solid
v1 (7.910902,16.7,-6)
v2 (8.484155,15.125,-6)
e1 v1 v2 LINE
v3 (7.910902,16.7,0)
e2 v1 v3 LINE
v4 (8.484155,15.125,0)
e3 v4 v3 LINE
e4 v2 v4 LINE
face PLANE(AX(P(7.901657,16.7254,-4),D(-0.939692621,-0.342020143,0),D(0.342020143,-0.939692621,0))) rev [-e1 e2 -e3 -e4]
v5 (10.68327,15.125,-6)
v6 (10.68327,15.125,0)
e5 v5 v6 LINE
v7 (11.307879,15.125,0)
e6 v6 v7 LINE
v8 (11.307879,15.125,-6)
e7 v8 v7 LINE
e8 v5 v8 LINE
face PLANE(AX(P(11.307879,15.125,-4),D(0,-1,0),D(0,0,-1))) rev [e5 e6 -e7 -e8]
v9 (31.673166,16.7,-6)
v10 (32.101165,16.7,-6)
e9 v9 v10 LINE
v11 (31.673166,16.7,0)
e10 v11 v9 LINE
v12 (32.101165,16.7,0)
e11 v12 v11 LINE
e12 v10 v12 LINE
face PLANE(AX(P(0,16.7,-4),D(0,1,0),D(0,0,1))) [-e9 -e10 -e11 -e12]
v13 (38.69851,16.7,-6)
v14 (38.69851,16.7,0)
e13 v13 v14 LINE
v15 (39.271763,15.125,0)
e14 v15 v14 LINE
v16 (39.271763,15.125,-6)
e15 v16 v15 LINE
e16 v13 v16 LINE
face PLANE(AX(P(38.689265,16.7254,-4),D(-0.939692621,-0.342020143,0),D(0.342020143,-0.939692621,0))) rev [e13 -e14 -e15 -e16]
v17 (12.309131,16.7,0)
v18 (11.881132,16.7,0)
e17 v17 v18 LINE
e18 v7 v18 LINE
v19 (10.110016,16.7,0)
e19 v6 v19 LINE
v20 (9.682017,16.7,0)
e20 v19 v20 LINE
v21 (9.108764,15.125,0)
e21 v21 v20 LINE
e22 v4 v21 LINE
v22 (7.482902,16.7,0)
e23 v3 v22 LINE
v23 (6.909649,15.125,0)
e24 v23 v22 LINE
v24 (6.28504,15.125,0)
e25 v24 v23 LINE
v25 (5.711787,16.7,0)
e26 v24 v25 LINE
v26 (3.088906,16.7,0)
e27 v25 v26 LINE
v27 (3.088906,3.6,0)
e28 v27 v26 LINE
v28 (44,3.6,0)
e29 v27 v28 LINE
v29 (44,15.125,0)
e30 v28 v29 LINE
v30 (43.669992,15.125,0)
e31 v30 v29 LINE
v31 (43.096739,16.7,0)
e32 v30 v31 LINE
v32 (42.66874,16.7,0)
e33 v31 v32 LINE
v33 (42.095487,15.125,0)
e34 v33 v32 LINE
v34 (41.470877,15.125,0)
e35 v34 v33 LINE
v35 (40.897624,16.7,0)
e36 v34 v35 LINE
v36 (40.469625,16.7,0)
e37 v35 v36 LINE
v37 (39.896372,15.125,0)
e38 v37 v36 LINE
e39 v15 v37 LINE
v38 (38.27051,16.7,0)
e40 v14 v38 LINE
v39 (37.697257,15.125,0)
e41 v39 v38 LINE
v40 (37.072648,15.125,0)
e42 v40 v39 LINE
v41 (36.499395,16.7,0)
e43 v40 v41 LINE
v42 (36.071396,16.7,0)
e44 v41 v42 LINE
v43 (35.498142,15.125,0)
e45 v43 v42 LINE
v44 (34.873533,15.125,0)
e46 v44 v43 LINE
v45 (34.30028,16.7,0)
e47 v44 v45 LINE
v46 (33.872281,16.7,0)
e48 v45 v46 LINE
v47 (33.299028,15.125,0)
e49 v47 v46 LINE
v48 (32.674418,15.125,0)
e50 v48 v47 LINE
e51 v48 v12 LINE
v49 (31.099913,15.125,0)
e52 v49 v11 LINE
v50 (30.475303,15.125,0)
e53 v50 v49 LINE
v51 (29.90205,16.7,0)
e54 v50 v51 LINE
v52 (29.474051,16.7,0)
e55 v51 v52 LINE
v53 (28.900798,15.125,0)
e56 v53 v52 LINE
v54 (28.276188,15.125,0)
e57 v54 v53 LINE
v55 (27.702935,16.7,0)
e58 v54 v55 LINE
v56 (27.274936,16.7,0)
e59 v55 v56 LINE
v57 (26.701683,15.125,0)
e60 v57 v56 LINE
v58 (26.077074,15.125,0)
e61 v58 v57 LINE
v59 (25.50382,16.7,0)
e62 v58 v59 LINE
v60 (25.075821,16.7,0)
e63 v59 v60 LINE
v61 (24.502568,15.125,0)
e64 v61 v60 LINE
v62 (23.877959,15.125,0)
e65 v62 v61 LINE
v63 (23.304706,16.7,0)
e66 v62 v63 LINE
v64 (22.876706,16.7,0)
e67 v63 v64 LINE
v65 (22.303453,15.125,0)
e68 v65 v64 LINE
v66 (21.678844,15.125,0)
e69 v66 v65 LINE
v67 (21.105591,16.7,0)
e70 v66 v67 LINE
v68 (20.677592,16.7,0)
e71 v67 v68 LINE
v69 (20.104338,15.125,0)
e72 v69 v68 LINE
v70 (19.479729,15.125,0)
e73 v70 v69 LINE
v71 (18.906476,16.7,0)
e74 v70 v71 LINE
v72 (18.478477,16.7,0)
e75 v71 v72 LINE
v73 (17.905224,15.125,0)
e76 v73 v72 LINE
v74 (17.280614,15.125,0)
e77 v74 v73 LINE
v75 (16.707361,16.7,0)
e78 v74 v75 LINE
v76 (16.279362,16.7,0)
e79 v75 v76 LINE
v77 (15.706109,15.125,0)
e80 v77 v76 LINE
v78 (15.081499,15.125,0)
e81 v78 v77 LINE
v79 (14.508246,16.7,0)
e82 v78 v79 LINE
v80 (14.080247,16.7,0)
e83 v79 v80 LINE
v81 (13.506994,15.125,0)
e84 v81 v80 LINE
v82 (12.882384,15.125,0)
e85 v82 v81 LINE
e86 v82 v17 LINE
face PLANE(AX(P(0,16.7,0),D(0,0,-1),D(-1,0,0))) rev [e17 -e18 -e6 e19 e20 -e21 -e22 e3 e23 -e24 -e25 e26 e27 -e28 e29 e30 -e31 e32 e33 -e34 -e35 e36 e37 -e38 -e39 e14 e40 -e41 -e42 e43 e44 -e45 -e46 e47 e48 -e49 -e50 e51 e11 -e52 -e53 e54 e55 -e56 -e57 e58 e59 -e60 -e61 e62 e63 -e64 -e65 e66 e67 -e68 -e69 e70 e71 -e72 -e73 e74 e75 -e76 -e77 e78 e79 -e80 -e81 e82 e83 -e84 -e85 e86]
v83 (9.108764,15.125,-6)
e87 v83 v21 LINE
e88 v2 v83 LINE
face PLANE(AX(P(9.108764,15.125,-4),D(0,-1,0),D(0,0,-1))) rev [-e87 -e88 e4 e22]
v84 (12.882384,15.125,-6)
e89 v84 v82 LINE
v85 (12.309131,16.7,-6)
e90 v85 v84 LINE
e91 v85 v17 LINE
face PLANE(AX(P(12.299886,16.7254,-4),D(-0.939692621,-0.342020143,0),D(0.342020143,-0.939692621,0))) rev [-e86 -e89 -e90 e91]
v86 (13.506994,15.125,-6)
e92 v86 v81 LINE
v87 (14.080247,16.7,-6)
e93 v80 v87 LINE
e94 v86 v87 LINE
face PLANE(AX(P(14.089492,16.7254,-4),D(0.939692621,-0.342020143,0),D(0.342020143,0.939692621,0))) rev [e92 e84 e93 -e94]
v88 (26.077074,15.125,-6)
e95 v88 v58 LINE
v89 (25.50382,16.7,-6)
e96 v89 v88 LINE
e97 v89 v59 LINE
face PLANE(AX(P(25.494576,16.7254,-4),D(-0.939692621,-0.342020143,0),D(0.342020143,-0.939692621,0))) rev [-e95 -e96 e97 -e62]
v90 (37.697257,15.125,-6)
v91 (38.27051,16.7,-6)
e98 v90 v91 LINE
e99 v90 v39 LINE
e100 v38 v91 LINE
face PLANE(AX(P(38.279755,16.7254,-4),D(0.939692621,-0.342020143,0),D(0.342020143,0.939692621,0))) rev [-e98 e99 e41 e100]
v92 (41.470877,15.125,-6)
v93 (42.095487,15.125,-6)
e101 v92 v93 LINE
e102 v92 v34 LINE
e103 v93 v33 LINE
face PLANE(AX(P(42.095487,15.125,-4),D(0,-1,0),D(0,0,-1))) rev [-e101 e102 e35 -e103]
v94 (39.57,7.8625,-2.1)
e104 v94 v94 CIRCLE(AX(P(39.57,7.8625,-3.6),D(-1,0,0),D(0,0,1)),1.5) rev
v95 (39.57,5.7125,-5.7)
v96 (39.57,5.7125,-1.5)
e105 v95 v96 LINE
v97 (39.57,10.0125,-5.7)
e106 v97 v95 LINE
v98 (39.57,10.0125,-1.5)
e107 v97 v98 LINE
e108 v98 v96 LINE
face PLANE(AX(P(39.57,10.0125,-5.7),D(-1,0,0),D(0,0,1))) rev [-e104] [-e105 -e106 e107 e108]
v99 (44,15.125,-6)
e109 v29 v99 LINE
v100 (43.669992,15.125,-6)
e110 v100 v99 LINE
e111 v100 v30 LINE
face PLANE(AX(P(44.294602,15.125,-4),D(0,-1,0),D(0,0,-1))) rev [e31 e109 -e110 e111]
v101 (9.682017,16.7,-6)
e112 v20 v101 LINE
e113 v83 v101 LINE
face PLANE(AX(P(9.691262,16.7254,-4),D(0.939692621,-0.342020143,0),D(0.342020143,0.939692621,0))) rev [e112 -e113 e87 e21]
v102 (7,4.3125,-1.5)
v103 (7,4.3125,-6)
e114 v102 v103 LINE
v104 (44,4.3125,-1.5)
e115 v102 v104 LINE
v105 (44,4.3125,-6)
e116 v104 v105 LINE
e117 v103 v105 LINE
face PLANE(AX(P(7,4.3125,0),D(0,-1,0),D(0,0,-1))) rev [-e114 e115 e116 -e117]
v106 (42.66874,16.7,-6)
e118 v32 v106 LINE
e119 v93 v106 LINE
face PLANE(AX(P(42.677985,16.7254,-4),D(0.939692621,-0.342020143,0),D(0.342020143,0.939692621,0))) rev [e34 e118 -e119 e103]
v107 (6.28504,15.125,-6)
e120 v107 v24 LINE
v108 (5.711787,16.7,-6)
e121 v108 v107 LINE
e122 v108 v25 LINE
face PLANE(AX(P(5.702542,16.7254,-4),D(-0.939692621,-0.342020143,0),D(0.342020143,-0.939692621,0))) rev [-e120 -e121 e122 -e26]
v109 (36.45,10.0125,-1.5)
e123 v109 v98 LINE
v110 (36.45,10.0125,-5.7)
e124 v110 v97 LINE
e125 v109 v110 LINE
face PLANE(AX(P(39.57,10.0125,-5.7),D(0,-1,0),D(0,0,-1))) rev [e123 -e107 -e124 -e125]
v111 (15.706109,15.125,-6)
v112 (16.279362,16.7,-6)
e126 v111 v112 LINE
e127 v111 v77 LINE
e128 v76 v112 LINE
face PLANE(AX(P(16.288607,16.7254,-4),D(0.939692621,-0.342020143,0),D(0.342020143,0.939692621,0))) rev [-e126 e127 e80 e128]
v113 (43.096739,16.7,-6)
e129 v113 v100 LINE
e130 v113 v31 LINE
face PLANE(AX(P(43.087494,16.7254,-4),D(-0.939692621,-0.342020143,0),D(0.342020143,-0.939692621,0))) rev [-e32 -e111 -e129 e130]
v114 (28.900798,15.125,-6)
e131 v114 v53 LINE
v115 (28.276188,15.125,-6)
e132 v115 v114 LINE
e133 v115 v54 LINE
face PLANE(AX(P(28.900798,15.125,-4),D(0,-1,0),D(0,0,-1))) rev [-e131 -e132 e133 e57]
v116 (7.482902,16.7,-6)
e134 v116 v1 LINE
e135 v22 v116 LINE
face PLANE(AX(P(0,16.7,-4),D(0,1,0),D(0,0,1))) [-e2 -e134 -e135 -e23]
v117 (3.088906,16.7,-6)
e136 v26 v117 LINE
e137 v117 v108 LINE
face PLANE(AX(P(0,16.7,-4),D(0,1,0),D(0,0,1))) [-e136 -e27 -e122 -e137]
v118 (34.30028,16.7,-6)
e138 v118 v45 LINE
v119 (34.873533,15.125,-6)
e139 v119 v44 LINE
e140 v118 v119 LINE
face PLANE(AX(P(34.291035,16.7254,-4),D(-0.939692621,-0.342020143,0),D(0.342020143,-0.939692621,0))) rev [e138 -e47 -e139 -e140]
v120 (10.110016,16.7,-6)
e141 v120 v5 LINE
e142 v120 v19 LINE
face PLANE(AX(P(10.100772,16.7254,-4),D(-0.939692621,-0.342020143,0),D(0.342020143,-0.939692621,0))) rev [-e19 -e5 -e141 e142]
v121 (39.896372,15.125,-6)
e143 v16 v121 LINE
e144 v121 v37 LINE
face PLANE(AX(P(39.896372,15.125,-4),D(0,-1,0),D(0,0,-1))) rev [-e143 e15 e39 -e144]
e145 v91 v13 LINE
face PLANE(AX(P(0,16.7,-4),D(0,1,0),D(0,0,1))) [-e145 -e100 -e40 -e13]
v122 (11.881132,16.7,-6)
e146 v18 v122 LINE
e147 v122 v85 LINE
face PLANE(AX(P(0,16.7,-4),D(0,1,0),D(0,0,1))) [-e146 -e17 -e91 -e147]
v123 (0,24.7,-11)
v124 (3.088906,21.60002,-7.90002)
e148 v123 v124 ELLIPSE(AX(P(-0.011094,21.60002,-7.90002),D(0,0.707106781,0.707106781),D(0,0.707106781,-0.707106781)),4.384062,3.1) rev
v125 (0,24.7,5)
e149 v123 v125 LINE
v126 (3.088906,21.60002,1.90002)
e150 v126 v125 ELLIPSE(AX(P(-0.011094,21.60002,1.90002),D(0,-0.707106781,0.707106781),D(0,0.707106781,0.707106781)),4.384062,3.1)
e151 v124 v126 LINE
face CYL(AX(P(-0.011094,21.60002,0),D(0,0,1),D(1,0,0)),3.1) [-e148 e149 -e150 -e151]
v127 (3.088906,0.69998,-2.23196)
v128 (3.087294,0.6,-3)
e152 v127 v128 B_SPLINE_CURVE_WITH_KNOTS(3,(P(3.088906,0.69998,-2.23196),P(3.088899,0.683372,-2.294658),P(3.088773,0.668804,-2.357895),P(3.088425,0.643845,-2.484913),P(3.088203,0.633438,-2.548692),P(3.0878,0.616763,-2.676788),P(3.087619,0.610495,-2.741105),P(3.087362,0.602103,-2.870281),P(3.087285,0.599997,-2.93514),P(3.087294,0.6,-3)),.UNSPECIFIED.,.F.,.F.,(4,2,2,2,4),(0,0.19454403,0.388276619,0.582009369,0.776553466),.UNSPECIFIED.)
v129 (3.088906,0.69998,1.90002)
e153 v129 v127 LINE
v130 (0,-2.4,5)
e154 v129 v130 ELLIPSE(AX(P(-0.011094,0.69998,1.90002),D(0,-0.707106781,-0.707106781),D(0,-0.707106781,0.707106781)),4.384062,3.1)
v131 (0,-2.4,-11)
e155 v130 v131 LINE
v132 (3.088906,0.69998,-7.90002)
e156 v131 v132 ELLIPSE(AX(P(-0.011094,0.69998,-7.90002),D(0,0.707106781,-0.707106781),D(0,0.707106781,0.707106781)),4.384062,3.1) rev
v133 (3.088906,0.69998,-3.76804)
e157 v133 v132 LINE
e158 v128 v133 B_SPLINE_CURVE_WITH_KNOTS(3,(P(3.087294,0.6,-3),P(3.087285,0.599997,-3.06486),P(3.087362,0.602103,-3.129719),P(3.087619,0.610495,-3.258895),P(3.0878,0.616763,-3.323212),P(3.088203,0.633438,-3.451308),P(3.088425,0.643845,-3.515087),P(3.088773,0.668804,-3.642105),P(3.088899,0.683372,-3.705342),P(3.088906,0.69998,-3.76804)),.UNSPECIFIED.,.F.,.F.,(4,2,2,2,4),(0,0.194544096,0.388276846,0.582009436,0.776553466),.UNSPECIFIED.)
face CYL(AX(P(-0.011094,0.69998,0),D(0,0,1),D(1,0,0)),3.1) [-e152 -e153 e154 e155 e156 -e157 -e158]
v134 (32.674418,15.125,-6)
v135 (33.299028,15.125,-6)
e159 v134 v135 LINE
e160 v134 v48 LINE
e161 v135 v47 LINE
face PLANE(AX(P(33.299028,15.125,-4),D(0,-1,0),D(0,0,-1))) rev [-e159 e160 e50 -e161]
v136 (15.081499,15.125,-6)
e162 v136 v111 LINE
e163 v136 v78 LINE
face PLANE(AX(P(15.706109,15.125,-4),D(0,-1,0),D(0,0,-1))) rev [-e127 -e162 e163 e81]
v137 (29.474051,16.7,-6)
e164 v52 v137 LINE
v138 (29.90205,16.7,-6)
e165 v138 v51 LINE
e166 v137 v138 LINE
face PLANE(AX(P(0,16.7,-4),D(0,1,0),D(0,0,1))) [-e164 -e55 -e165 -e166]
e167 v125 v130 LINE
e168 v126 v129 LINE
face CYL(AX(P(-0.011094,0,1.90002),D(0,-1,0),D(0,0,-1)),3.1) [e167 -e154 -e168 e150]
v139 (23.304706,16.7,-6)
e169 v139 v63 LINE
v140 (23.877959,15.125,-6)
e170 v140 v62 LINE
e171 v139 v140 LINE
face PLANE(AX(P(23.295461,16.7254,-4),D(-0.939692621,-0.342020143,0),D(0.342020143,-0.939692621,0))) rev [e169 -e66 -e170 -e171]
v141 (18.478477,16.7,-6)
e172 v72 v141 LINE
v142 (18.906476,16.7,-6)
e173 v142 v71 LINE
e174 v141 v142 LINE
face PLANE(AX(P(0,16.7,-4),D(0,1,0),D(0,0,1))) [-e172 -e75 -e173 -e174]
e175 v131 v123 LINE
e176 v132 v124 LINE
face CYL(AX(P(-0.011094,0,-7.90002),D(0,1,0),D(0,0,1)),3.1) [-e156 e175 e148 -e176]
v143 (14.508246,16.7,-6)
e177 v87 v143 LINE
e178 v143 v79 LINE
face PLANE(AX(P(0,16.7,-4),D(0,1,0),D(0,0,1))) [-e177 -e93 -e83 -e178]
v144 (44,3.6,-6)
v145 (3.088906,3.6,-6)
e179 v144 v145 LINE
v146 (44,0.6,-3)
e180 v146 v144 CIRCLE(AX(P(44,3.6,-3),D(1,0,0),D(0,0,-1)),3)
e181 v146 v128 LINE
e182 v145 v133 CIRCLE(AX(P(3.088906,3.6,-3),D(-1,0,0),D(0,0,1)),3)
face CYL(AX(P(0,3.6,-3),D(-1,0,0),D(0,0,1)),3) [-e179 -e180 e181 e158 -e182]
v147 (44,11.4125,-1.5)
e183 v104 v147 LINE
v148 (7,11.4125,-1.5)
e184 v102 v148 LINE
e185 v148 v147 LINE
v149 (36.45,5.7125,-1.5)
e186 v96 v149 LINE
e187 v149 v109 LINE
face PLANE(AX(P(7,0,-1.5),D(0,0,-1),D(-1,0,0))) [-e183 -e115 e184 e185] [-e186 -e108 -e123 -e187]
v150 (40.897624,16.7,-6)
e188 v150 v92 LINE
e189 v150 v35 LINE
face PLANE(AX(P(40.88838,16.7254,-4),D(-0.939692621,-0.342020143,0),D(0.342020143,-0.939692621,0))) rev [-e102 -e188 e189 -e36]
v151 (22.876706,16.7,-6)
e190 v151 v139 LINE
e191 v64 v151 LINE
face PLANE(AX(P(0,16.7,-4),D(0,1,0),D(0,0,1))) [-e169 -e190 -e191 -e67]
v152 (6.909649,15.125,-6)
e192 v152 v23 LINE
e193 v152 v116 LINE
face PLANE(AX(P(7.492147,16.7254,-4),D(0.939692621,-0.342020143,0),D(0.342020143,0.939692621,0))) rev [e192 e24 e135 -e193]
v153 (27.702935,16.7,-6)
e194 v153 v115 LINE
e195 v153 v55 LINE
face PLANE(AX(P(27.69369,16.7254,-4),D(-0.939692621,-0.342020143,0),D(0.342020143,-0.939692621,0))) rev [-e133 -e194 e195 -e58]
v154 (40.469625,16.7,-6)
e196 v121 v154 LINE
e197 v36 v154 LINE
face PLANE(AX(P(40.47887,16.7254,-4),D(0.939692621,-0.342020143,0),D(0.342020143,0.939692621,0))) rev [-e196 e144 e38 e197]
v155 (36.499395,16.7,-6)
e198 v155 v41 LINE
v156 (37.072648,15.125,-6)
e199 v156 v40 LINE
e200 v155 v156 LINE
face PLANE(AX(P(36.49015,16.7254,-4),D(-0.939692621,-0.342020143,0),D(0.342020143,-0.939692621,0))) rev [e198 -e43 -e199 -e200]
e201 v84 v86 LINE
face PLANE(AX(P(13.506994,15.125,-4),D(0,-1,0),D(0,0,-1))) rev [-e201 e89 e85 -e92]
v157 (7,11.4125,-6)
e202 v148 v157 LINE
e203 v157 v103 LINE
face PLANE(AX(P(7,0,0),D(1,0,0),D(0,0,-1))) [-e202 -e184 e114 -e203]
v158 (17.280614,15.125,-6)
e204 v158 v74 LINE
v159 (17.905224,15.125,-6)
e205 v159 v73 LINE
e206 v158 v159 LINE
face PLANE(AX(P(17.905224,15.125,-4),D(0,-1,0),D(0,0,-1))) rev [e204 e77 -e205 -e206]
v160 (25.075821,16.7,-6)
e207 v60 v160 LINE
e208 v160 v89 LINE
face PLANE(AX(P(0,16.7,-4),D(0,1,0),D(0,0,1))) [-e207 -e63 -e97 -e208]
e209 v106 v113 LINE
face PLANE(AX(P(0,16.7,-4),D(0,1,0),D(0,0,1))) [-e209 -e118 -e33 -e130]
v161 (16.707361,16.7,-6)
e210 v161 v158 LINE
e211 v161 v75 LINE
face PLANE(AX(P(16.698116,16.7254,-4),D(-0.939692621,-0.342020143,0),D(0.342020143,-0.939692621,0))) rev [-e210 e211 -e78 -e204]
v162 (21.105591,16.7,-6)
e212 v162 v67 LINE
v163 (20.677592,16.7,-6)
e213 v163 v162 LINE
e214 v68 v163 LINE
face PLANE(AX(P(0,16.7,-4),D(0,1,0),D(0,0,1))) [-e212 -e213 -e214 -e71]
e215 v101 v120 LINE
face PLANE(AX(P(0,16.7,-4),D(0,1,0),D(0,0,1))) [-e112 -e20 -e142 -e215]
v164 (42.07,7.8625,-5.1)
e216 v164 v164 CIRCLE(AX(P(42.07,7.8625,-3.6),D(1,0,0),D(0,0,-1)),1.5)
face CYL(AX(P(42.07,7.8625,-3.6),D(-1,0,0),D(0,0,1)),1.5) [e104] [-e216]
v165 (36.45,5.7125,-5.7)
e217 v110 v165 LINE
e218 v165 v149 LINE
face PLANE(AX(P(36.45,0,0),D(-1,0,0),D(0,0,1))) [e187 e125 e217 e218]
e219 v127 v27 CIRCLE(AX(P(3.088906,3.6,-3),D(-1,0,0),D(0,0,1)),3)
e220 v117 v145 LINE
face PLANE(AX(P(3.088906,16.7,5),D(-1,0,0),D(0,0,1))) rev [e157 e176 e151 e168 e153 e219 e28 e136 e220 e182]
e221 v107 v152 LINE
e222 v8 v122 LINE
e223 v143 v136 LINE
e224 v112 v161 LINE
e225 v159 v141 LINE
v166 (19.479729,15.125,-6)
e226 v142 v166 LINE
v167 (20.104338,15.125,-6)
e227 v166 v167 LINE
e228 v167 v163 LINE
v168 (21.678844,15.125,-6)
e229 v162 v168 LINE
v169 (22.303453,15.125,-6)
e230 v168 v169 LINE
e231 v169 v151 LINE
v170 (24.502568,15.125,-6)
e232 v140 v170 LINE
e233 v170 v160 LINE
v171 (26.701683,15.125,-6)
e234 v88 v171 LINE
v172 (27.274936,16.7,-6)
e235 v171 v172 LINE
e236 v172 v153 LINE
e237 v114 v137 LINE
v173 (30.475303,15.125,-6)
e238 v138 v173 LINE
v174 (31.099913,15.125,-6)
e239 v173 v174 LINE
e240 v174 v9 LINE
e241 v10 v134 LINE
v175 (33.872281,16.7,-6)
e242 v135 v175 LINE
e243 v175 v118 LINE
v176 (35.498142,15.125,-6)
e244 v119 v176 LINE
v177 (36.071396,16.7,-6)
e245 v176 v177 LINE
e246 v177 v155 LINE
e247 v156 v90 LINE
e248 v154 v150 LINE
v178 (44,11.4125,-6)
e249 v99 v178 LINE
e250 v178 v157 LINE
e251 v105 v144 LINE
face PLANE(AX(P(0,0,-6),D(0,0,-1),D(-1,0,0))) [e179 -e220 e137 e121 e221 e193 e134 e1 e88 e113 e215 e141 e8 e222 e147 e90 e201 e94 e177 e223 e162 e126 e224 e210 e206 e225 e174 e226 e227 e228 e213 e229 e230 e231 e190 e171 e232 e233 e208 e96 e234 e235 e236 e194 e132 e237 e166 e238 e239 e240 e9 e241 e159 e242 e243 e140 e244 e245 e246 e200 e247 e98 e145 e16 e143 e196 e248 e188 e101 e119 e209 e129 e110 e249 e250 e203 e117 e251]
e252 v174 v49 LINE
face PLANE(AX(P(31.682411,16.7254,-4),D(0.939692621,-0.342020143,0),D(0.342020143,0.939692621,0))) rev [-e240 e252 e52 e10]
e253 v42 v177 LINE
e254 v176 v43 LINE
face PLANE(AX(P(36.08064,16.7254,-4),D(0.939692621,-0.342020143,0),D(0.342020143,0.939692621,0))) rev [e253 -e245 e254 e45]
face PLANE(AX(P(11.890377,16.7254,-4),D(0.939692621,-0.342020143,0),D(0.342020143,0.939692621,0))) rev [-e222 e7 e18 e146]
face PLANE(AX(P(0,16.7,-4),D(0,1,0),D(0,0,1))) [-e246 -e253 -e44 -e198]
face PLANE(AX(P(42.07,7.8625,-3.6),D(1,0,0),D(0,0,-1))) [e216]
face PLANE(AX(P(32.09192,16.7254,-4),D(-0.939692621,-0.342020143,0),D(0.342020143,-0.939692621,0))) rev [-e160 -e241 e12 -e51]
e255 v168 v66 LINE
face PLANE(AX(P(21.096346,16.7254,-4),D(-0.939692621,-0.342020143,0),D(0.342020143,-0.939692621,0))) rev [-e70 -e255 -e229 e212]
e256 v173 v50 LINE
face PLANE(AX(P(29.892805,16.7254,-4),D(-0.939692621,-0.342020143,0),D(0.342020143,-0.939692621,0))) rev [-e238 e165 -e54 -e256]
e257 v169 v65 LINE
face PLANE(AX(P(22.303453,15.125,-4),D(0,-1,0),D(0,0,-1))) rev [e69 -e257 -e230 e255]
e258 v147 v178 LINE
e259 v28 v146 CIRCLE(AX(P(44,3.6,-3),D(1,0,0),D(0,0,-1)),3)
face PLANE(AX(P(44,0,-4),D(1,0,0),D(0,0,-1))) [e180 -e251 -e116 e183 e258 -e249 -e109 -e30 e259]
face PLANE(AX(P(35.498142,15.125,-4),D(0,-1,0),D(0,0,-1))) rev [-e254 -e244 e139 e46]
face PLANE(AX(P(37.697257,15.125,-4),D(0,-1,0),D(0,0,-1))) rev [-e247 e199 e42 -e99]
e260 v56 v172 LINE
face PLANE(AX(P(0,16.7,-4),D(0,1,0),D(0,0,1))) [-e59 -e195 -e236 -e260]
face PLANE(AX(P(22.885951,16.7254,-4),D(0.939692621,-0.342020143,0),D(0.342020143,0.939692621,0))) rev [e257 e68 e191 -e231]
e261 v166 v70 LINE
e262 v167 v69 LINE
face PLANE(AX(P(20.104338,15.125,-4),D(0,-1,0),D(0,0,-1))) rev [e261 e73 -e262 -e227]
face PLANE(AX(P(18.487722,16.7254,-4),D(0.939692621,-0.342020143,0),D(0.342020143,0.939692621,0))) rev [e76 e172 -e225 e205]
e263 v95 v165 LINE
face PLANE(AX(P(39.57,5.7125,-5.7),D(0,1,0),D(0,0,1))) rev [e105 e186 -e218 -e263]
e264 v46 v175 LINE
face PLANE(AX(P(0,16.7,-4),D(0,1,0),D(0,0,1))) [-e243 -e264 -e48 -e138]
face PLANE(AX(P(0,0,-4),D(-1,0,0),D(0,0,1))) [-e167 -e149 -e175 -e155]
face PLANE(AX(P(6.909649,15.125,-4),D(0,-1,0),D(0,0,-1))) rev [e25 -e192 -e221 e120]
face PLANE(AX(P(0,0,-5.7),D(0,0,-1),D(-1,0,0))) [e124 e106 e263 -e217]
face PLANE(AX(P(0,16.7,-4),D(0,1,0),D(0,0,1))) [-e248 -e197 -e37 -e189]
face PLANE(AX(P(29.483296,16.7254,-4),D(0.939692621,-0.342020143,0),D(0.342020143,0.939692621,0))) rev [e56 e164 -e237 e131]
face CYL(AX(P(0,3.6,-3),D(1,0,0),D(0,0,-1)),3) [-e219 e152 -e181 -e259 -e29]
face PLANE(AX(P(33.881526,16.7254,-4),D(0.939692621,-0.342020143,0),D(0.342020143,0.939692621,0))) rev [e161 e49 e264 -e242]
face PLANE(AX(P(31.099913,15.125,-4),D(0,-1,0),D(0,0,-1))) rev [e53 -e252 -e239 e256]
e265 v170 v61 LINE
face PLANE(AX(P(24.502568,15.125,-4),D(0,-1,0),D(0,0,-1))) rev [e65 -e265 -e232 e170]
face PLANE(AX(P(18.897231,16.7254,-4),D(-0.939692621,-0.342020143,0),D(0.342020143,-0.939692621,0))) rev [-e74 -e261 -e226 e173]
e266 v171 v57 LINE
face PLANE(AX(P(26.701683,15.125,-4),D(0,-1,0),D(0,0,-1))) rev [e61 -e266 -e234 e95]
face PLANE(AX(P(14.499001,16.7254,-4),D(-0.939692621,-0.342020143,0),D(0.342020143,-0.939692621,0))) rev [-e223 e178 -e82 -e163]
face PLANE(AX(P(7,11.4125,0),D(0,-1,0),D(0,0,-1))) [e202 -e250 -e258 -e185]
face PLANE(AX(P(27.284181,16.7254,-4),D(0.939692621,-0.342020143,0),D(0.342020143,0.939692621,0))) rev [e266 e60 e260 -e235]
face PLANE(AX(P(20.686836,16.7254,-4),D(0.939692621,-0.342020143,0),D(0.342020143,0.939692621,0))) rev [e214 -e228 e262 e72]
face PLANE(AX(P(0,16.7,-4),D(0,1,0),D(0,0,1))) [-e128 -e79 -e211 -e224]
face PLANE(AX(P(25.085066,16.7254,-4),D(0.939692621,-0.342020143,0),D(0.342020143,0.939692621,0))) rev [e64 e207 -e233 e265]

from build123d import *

# Parameters (mm, degrees)
BLANKSKE_W               = 44
BLANKSKE_H               = 16.7
BLANK_DEPTH              = 4
TOOTHCUTSIM_DEPTH        = 48.232298271
TEETHCUTS_COUNT          = 21
TEETHCUTS_PITCH          = 2.199114855
CROQUIS2_W               = 44
CROQUIS2_H               = 4
CORTAR_EXTRUIR2_DEPTH    = 0.6
CROQUIS3_W               = 2.5
CROQUIS3_H               = 7.1
CORTAR_EXTRUIR3_DEPTH    = 37
CROQUIS4_W               = 5.711786687
CROQUIS4_H               = 1.575
SALIENTE_EXTRUIR4_DEPTH  = 4
CROQUIS5_W               = 1.12
CROQUIS5_H               = 4.3
SALIENTE_EXTRUIR5_DEPTH  = 4.2
CROQUIS14_R              = 1.5
SALIENTE_EXTRUIR11_DEPTH = 2.5
CROQUIS15_W              = 3.088906297
CROQUIS15_H              = 16.1
SALIENTE_EXTRUIR12_DEPTH = 5
CROQUIS16_W              = 2.855893344
CROQUIS16_H              = 16.1
SALIENTE_EXTRUIR13_DEPTH = 5
SALIENTE_EXTRUIR14_DEPTH = 2
CROQUIS18_W              = 4.2
CROQUIS18_H              = 4.3
SALIENTE_EXTRUIR15_DEPTH = 2
CROQUIS19_W              = 2.855893344
CROQUIS19_H              = 14
SALIENTE_EXTRUIR16_DEPTH = 8
CROQUIS20_W              = 2.855893344
CROQUIS20_H              = 24.1
SALIENTE_EXTRUIR18_DEPTH = 2
SALIENTE_EXTRUIR19_DEPTH = 3
CROQUIS31_W              = 2.855893344
CROQUIS31_H              = 27.1
SALIENTE_EXTRUIR20_DEPTH = 16
CROQUIS32_W              = 3.088906297
CROQUIS32_H              = 27.1
SALIENTE_EXTRUIR21_DEPTH = 16
REDONDEO3_R              = 3
REDONDEO4_R              = 3.1


# Some blends are built 0.0001 mm under size
with BuildPart() as part:
    # BlankSke → Blank (new body)
    with BuildSketch(Plane.XY):
        with Locations((22, 8.35)):
            Rectangle(BLANKSKE_W, BLANKSKE_H)
    extrude(amount=-BLANK_DEPTH)

    # TooCutSkeSim → ToothCutSim (cut, through all)
    with BuildSketch(Plane.XY):
        Polygon((0.312304759, 15.125), (-0.312304759, 15.125), (-0.894802722, 16.7254), (0.894802722, 16.7254), align=None)
    toothcutsim = extrude(amount=-TOOTHCUTSIM_DEPTH, mode=Mode.SUBTRACT)

    # TeethCuts: ToothCutSim ×21
    with Locations(*[(i * TEETHCUTS_PITCH, 0, 0) for i in range(1, TEETHCUTS_COUNT)]):
        add(toothcutsim, mode=Mode.SUBTRACT)

    # Croquis2 → Cortar-Extruir2 (cut)
    with BuildSketch(Plane.XZ):
        with Locations((22, -2)):
            Rectangle(CROQUIS2_W, CROQUIS2_H)
    extrude(amount=-CORTAR_EXTRUIR2_DEPTH, mode=Mode.SUBTRACT)

    # Croquis3 → Cortar-Extruir3 (cut)
    with BuildSketch(Plane(origin=(44, 0, 0), x_dir=(0, 0, -1), z_dir=(1, 0, 0))):
        with Locations((2.75, 7.8625)):
            Rectangle(CROQUIS3_W, CROQUIS3_H)
    extrude(amount=-CORTAR_EXTRUIR3_DEPTH, mode=Mode.SUBTRACT)

    # Croquis4 → Saliente-Extruir4 (add)
    with BuildSketch(Plane.XY):
        with Locations((2.855893344, 15.9125)):
            Rectangle(CROQUIS4_W, CROQUIS4_H)
    extrude(amount=-SALIENTE_EXTRUIR4_DEPTH)

    # Croquis5 → Saliente-Extruir5 (add)
    with BuildSketch(Plane(origin=(0, 0, -1.5), x_dir=(-1, 0, 0), z_dir=(0, 0, -1))):
        with Locations((-39.01, 7.8625)):
            Rectangle(CROQUIS5_W, CROQUIS5_H)
    extrude(amount=SALIENTE_EXTRUIR5_DEPTH)

    # Croquis14 → Saliente-Extruir11 (add)
    with BuildSketch(Plane(origin=(39.57, 0, 0), x_dir=(0, 0, -1), z_dir=(1, 0, 0))):
        with Locations(Location((3.6, 7.8625, 0), (0, 0, 180))):
            Circle(CROQUIS14_R)
    extrude(amount=SALIENTE_EXTRUIR11_DEPTH)

    # Croquis15 → Saliente-Extruir12 (add)
    with BuildSketch(Plane.XY):
        with Locations((1.544453149, 8.65)):
            Rectangle(CROQUIS15_W, CROQUIS15_H)
    extrude(amount=SALIENTE_EXTRUIR12_DEPTH)

    # Croquis16 → Saliente-Extruir13 (add)
    with BuildSketch(Plane(origin=(0, 0, -4), x_dir=(-1, 0, 0), z_dir=(0, 0, -1))):
        with Locations((-1.427946672, 8.65)):
            Rectangle(CROQUIS16_W, CROQUIS16_H)
    extrude(amount=SALIENTE_EXTRUIR13_DEPTH)

    # Croquis17 → Saliente-Extruir14 (add)
    with BuildSketch(Plane(origin=(0, 0, -4), x_dir=(-1, 0, 0), z_dir=(0, 0, -1))):
        Polygon((-44, 0.6), (-2.855893344, 0.6), (-2.855893344, 16.7), (-5.711786687, 16.7), (-6.285039806, 15.125), (-6.909649324, 15.125), (-7.482902443, 16.7), (-7.910901542, 16.7), (-8.484154661, 15.125), (-9.108764179, 15.125), (-9.682017298, 16.7), (-10.110016397, 16.7), (-10.683269516, 15.125), (-11.307879034, 15.125), (-11.881132153, 16.7), (-12.309131252, 16.7), (-12.882384371, 15.125), (-13.506993889, 15.125), (-14.080247008, 16.7), (-14.508246107, 16.7), (-15.081499226, 15.125), (-15.706108744, 15.125), (-16.279361863, 16.7), (-16.707360962, 16.7), (-17.280614081, 15.125), (-17.905223599, 15.125), (-18.478476718, 16.7), (-18.906475817, 16.7), (-19.479728936, 15.125), (-20.104338454, 15.125), (-20.677591573, 16.7), (-21.105590672, 16.7), (-21.678843791, 15.125), (-22.303453309, 15.125), (-22.876706428, 16.7), (-23.304705527, 16.7), (-23.877958646, 15.125), (-24.502568164, 15.125), (-25.075821283, 16.7), (-25.503820382, 16.7), (-26.077073501, 15.125), (-26.701683019, 15.125), (-27.274936138, 16.7), (-27.702935237, 16.7), (-28.276188356, 15.125), (-28.900797874, 15.125), (-29.474050993, 16.7), (-29.902050092, 16.7), (-30.475303211, 15.125), (-31.099912729, 15.125), (-31.673165848, 16.7), (-32.101164947, 16.7), (-32.674418066, 15.125), (-33.299027584, 15.125), (-33.872280703, 16.7), (-34.300279802, 16.7), (-34.873532921, 15.125), (-35.498142439, 15.125), (-36.071395558, 16.7), (-36.499394657, 16.7), (-37.072647776, 15.125), (-37.697257294, 15.125), (-38.270510413, 16.7), (-38.698509512, 16.7), (-39.271762631, 15.125), (-39.896372149, 15.125), (-40.469625268, 16.7), (-40.897624367, 16.7), (-41.470877486, 15.125), (-42.095487004, 15.125), (-42.668740123, 16.7), (-43.096739222, 16.7), (-43.669992341, 15.125), (-44, 15.125), (-44, 11.4125), (-7, 11.4125), (-7, 4.3125), (-44, 4.3125), align=None)
    extrude(amount=SALIENTE_EXTRUIR14_DEPTH)

    # Croquis18 → Saliente-Extruir15 (add)
    with BuildSketch(Plane.ZY.offset(-38.45)):
        with Locations((-3.6, 7.8625)):
            Rectangle(CROQUIS18_W, CROQUIS18_H)
    extrude(amount=SALIENTE_EXTRUIR15_DEPTH)

    # Croquis19 → Saliente-Extruir16 (add)
    with BuildSketch(Plane(origin=(0, 16.7, 0), x_dir=(1, 0, 0), z_dir=(0, 1, 0))):
        with Locations((1.427946672, 2)):
            Rectangle(CROQUIS19_W, CROQUIS19_H)
    extrude(amount=SALIENTE_EXTRUIR16_DEPTH)

    # Croquis20 → Saliente-Extruir18 (add)
    with BuildSketch(Plane(origin=(0, 0, -9), x_dir=(-1, 0, 0), z_dir=(0, 0, -1))):
        with Locations((-1.427946672, 12.65)):
            Rectangle(CROQUIS20_W, CROQUIS20_H)
    extrude(amount=SALIENTE_EXTRUIR18_DEPTH)

    # Croquis21 → Saliente-Extruir19 (add)
    with BuildSketch(Plane.XZ.offset(-0.6)):
        Polygon((3.088906297, 0), (2.855893344, -6), (2.855893344, -11), (0, -11), (0, 5), (3.088906297, 5), align=None)
    extrude(amount=SALIENTE_EXTRUIR19_DEPTH)

    # Croquis31 → Saliente-Extruir20 (add)
    with BuildSketch(Plane(origin=(0, 0, -11), x_dir=(-1, 0, 0), z_dir=(0, 0, -1))):
        with Locations((-1.427946672, 11.15)):
            Rectangle(CROQUIS31_W, CROQUIS31_H)
    extrude(amount=-SALIENTE_EXTRUIR20_DEPTH)

    # Croquis32 → Saliente-Extruir21 (add)
    with BuildSketch(Plane.XY.offset(5)):
        with Locations((1.544453149, 11.15)):
            Rectangle(CROQUIS32_W, CROQUIS32_H)
    extrude(amount=-SALIENTE_EXTRUIR21_DEPTH)

    # Redondeo3
    redondeo3_edges = [part.edges().sort_by_distance(p)[0] for p in [
        (23.544453148, 0.6, -6),
        (23.544453148, 0.6, 0),
    ]]
    fillet(redondeo3_edges, radius=REDONDEO3_R - 0.0001)  # a hair under: the kernel refuses the full size

    # Redondeo4
    # the kernel refuses this fillet: 3.1 mm, written as the material it takes off along each edge
    with BuildSketch(Plane(origin=(3.088906297, -2.4, -18.75), x_dir=(0, 1, 0), z_dir=(0, 0, 1))) as redondeo4_piece_1_section:
        with BuildLine():
            CenterArc((REDONDEO4_R, REDONDEO4_R), REDONDEO4_R, 180, 90)
            Line((0, REDONDEO4_R), (0, 0))
            Line((0, 0), (REDONDEO4_R, 0))
        make_face()
    redondeo4_piece_1 = extrude(amount=31.5, mode=Mode.PRIVATE)
    redondeo4_piece_1 = redondeo4_piece_1 - Plane(origin=(2.386115021, 3.5999, -3.0001), x_dir=(0, -1, 0), z_dir=(-1, 0, 0)) * Cylinder(2.9999, 76, mode=Mode.PRIVATE)
    add(redondeo4_piece_1, mode=Mode.SUBTRACT)
    with BuildSketch(Plane(origin=(3.088906297, -10.15, 5), x_dir=(0, 0, -1), z_dir=(0, 1, 0)), Plane(origin=(3.088906297, 32.45, -11), x_dir=(0, 0, 1), z_dir=(0, -1, 0))) as redondeo4_piece_2:
        with BuildLine():
            CenterArc((REDONDEO4_R, REDONDEO4_R), REDONDEO4_R, 180, 90)
            Line((0, REDONDEO4_R), (0, 0))
            Line((0, 0), (REDONDEO4_R, 0))
        make_face()
    extrude(amount=42.6, mode=Mode.SUBTRACT)
    with BuildSketch(Plane(origin=(3.088906297, 24.7, 12.75), x_dir=(0, -1, 0), z_dir=(0, 0, -1))) as redondeo4_piece_3:
        with BuildLine():
            CenterArc((REDONDEO4_R, REDONDEO4_R), REDONDEO4_R, 180, 90)
            Line((0, REDONDEO4_R), (0, 0))
            Line((0, 0), (REDONDEO4_R, 0))
        make_face()
    extrude(amount=31.5, mode=Mode.SUBTRACT)


solid = part.part
